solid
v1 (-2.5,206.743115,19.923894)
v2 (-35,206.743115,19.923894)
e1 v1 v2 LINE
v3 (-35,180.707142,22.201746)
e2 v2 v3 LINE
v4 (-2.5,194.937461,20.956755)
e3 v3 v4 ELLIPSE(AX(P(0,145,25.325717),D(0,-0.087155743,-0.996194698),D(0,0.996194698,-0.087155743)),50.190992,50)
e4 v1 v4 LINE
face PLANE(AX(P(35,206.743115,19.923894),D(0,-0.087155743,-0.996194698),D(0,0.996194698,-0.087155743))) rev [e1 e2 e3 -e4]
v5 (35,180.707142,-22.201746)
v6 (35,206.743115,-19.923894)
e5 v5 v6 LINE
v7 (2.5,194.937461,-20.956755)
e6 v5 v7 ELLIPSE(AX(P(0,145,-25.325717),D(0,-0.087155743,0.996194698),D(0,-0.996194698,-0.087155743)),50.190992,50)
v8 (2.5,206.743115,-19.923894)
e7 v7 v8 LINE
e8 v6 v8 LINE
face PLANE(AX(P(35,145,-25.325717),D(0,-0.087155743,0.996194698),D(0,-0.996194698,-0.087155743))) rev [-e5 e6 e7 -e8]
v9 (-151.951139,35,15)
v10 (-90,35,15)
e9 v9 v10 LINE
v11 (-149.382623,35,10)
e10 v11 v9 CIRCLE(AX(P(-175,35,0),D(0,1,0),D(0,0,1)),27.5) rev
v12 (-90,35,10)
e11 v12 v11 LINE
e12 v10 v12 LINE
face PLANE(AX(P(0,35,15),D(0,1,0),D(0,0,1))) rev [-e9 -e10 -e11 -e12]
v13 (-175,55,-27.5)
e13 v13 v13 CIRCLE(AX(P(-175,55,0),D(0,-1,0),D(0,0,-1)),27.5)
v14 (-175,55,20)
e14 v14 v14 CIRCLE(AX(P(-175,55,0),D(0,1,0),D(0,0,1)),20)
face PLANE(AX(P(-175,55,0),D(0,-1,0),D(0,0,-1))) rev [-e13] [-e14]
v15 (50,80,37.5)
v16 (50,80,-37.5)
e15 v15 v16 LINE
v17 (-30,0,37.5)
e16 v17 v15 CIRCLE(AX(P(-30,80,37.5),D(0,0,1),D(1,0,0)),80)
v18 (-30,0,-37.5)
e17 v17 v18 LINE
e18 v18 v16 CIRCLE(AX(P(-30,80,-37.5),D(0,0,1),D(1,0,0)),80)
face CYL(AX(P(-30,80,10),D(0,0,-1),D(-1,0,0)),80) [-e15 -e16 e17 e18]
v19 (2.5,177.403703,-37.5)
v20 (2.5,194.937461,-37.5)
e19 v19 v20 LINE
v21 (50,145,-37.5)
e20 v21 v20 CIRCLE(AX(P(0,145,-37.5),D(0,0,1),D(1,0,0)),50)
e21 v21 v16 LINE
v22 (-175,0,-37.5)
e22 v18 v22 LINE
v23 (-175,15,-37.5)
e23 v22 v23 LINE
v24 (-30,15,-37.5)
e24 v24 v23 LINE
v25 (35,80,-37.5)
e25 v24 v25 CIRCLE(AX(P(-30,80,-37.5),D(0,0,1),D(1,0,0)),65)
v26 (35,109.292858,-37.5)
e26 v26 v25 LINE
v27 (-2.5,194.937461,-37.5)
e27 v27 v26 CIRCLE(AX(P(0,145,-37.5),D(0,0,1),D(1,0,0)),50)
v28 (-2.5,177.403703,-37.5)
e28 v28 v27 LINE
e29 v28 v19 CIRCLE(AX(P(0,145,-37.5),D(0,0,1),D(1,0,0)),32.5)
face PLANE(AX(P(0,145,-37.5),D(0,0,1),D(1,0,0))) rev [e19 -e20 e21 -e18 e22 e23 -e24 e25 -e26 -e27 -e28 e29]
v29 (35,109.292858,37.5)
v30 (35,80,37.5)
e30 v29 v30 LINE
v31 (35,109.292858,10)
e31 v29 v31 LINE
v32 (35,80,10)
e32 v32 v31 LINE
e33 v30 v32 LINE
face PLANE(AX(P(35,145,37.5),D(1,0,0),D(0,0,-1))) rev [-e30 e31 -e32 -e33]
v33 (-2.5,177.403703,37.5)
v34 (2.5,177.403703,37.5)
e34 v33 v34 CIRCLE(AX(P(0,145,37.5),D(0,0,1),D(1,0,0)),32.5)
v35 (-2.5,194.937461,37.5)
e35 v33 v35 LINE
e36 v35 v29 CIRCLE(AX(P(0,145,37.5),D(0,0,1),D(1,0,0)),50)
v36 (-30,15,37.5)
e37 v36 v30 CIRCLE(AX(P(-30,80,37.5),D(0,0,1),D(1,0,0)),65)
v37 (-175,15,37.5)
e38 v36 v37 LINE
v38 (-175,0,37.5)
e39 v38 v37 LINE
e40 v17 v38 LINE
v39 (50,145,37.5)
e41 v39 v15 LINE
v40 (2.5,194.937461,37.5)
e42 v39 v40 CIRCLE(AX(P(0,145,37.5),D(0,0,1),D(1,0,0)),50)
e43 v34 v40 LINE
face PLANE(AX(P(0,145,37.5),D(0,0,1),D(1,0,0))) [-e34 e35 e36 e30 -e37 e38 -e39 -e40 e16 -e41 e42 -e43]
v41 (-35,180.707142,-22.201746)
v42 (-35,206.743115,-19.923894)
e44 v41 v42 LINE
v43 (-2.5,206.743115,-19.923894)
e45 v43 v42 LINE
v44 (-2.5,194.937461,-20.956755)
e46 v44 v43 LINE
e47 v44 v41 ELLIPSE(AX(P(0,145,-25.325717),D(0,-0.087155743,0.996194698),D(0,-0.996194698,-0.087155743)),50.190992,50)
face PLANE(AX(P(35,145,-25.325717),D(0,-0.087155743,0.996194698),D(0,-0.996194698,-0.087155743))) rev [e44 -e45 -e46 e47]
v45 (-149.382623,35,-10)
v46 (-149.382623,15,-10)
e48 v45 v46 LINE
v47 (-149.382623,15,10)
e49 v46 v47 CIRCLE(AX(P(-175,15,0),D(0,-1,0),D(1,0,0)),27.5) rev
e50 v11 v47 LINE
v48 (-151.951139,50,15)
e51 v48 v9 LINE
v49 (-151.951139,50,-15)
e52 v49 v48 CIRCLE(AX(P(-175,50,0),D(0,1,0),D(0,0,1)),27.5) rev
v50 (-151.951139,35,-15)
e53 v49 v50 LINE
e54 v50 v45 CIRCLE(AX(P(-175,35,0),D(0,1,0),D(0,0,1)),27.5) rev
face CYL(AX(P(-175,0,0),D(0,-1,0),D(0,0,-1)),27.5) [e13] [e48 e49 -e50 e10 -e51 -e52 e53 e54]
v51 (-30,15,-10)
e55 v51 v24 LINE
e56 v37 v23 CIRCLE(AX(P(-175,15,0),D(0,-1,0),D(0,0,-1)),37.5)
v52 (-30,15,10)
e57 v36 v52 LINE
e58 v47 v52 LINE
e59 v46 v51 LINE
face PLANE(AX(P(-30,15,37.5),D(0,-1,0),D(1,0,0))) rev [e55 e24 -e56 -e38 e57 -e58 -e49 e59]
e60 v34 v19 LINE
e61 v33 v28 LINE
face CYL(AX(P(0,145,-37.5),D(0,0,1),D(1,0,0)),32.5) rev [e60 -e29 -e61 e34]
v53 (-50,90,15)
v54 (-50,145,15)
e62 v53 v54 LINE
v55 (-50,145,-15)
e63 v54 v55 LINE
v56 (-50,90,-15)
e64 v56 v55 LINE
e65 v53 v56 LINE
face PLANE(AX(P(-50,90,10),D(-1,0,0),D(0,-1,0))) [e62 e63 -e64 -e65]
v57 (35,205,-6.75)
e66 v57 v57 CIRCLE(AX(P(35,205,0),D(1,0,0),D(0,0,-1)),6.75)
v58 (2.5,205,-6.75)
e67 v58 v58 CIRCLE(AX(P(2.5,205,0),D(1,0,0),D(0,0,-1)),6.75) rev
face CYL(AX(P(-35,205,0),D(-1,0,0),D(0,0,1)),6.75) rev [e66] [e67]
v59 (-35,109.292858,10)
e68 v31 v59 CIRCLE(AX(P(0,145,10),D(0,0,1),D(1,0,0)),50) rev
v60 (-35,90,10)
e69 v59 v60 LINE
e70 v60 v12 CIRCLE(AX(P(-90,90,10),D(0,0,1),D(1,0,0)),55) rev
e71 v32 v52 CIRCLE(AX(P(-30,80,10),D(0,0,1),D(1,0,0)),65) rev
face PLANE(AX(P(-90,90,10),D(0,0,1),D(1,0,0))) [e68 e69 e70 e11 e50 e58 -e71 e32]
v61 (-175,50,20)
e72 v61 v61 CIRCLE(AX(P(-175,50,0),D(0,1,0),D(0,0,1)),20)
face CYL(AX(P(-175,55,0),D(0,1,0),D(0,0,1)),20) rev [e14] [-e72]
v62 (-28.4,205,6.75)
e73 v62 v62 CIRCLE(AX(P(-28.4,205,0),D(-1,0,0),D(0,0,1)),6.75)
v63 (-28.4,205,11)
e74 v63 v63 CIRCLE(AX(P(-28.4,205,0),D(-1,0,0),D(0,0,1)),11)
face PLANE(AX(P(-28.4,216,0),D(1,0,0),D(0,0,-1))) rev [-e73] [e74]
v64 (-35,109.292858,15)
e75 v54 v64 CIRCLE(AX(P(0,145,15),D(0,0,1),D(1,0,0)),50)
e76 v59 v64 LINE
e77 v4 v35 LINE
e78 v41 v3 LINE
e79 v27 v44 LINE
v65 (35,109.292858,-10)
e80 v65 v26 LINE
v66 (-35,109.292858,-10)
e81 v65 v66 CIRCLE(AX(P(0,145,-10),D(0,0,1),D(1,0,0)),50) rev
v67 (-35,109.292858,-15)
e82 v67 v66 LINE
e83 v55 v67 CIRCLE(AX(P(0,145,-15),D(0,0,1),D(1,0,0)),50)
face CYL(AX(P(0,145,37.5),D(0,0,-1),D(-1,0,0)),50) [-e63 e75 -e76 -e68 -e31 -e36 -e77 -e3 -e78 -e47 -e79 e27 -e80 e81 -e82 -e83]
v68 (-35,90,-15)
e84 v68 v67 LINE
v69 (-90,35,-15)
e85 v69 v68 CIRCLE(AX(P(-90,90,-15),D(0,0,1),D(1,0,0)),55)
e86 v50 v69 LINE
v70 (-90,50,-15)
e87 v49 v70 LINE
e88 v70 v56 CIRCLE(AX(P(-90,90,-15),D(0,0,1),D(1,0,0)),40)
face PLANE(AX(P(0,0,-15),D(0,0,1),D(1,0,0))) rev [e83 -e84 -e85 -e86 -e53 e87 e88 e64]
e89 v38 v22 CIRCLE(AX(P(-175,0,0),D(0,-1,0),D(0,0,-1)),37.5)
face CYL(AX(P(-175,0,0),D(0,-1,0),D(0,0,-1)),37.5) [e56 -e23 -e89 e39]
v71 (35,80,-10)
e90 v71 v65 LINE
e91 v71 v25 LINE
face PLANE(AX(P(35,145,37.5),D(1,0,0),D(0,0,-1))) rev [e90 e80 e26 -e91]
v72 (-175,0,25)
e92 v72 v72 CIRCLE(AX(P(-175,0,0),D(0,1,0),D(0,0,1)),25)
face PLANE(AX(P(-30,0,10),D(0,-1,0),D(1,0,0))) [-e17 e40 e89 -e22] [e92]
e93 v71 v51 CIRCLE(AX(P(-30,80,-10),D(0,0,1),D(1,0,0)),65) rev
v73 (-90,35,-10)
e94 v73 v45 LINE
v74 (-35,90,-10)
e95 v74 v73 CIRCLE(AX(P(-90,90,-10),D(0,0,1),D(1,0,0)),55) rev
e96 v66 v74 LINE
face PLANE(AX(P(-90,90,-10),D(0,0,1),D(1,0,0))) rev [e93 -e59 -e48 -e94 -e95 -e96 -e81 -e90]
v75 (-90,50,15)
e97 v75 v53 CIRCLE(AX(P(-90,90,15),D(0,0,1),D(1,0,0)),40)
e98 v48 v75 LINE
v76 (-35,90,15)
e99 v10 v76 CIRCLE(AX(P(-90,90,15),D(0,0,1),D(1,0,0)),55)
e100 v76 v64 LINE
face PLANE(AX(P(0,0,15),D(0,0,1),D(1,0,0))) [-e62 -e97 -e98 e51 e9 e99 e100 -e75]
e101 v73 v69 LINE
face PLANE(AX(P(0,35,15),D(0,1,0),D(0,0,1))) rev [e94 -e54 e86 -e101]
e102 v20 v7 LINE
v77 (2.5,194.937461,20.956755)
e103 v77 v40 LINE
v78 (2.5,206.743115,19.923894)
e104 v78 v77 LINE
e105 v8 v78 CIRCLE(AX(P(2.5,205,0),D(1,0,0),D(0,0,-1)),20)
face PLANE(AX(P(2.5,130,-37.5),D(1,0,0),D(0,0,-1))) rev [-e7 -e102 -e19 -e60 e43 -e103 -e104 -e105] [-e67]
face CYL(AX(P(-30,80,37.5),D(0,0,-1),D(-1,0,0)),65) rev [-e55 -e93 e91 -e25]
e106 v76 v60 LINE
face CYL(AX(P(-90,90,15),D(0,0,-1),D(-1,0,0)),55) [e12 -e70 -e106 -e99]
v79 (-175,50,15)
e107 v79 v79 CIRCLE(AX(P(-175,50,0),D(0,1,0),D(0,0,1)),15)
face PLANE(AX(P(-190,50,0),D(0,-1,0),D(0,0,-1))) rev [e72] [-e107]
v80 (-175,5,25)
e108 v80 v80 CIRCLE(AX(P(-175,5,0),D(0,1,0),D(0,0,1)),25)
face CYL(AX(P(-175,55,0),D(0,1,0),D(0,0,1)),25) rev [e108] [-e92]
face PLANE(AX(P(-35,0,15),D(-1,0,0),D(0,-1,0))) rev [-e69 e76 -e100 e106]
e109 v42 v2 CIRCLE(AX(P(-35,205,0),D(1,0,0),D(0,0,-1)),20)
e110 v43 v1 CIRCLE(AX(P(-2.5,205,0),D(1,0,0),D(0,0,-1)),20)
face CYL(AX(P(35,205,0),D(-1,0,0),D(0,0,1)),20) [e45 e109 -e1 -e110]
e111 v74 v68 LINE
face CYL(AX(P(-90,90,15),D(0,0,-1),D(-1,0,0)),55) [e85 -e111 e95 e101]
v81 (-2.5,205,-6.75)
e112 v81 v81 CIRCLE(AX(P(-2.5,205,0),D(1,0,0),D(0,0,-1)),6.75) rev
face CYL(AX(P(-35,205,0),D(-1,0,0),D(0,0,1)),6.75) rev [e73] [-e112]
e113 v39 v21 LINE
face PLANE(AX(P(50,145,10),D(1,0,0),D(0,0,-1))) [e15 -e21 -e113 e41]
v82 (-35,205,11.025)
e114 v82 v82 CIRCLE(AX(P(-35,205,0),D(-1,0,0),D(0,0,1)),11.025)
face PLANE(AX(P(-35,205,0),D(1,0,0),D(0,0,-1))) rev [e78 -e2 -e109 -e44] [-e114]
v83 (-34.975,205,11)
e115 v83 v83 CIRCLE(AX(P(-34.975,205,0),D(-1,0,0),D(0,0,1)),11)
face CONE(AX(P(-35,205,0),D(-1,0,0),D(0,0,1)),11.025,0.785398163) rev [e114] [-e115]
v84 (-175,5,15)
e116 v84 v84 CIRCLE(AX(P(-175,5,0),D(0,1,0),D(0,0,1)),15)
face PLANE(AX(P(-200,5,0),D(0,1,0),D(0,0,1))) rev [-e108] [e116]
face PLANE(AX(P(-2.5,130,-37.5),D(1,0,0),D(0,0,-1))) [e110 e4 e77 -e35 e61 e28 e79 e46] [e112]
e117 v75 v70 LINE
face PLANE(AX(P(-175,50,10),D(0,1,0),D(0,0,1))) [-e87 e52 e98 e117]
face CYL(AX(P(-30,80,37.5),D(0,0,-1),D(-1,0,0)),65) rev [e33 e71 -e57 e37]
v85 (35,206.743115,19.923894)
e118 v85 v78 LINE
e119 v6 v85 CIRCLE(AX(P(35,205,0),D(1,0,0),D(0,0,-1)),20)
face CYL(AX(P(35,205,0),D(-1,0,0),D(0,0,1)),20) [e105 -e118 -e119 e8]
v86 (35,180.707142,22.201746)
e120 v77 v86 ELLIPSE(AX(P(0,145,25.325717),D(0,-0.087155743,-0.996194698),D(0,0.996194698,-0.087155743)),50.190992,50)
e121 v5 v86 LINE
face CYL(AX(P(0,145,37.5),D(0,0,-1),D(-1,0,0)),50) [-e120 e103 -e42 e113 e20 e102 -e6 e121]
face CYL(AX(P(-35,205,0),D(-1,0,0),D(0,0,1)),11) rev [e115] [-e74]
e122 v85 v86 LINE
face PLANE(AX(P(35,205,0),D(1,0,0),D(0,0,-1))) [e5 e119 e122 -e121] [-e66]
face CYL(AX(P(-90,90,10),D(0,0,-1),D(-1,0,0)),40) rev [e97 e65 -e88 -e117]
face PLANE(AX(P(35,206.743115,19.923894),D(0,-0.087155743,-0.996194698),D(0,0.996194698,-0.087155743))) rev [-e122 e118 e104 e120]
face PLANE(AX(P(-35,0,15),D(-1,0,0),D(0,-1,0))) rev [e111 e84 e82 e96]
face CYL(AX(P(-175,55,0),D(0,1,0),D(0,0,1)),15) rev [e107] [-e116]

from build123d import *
from build123d.topology import SkipClean

# Parameters (mm, degrees)
BOSS_EXTRUDE1_DEPTH     = 10
SKETCH1_3_R             = 50
BOSS_EXTRUDE2_DEPTH     = 37.5
BOSS_EXTRUDE3_DEPTH     = 15
BOSS_EXTRUDE4_DEPTH     = 37.5
BOSS_EXTRUDE5_DEPTH     = 35
CUT_EXTRUDE1_DEPTH      = 312.749097833
CUT_EXTRUDE1_DEPTH_BACK = 312.749097833
SKETCH12_R              = 32.5
SKETCH12_W              = 5
SKETCH12_H              = 95


with BuildPart() as part:
    # Sketch1 → Boss-Extrude1 (new, symmetric)
    with BuildSketch(Plane.XY):
        with BuildLine():
            Line((50, 145), (50, 80))
            ThreePointArc((50, 80), (26.568542495, 23.431457505), (-30, 0))
            Line((-30, 0), (-175, 0))
            Line((-175, 0), (-175, 50))
            Line((-175, 50), (-90, 50))
            ThreePointArc((-90, 50), (-61.715728753, 61.715728753), (-50, 90))
            Line((-50, 90), (-50, 145))
            Line((-50, 145), (50, 145))
        make_face()
    extrude(amount=BOSS_EXTRUDE1_DEPTH, both=True)

    # Sketch1<3> → Boss-Extrude2 (add, symmetric)
    with BuildSketch(Plane.XY):
        with Locations((0, 145)):
            Circle(SKETCH1_3_R)
    extrude(amount=BOSS_EXTRUDE2_DEPTH, both=True)

    # Sketch2 → Boss-Extrude3 (add, symmetric)
    with SkipClean():  # the faces are left unmerged after this step: merging them gives an invalid solid
        with BuildSketch(Plane.XY):
            with BuildLine():
                ThreePointArc((-90, 35), (-51.109127035, 51.109127035), (-35, 90))
                Line((-35, 90), (-35, 145))
                Line((-35, 145), (-50, 145))
                Line((-50, 145), (-50, 90))
                ThreePointArc((-50, 90), (-61.715728753, 61.715728753), (-90, 50))
                Line((-90, 50), (-175, 50))
                Line((-175, 50), (-175, 35))
                Line((-175, 35), (-90, 35))
            make_face()
        extrude(amount=BOSS_EXTRUDE3_DEPTH, both=True)
    add(part.part.scale(1), mode=Mode.REPLACE)  # the faces are merged on a copy

    # Sketch2<3> → Boss-Extrude4 (add, symmetric)
    with SkipClean():  # the faces are left unmerged after this step: merging them gives an invalid solid
        with BuildSketch(Plane.XY):
            with BuildLine():
                Line((-30, 15), (-175, 15))
                Line((-175, 15), (-175, 0))
                Line((-175, 0), (-30, 0))
                ThreePointArc((-30, 0), (26.568542495, 23.431457505), (50, 80))
                Line((50, 80), (50, 145))
                Line((50, 145), (35, 145))
                Line((35, 145), (35, 80))
                ThreePointArc((35, 80), (15.961940777, 34.038059223), (-30, 15))
            make_face()
        extrude(amount=BOSS_EXTRUDE4_DEPTH, both=True)
    add(part.part.scale(1), mode=Mode.REPLACE)  # the faces are merged on a copy

    # Sketch4 → Revolve1 (revolve)
    with BuildSketch(Plane.XY):
        Polygon((-175, 55), (-202.5, 55), (-202.5, 15), (-212.5, 15), (-212.5, 0), (-175, 0), align=None)
    revolve(axis=Axis((-175, 0, 0), (0, 1, 0)))

    # Sketch6 → Boss-Extrude5 (add, symmetric)
    with BuildSketch(Plane(origin=(0, 0, 0), x_dir=(0, 0, -1), z_dir=(1, 0, 0))):
        with BuildLine():
            Line((-25.325716562, 145), (25.325716562, 145))
            Line((25.325716562, 145), (19.923893962, 206.743114855))
            ThreePointArc((19.923893962, 206.743114855), (0, 225), (-19.923893962, 206.743114855))
            Line((-19.923893962, 206.743114855), (-25.325716562, 145))
        make_face()
    extrude(amount=BOSS_EXTRUDE5_DEPTH, both=True)

    # Sketch11 → CBORE for M12 SBHCS1 (revolve, cut)
    with BuildSketch(Plane(origin=(-35, 205, 0), x_dir=(0, 0, 1), z_dir=(0, 1, 0))):
        Polygon((0, 0), (0, 85), (6.75, 85), (6.75, 6.6), (11, 6.6), (11, 0.025), (11.025, 0), align=None)
    revolve(axis=Axis((-41.35, 205, 0), (1, 0, 0)), mode=Mode.SUBTRACT)

    # Sketch12 → Cut-Extrude1 (cut, two sides: drawn at the far end of the back side and taken through both)
    with BuildSketch(Plane.XY.offset(-CUT_EXTRUDE1_DEPTH_BACK)):
        with Locations((0, 145)):
            Circle(SKETCH12_R)
        with Locations((0, 177.5)):
            Rectangle(SKETCH12_W, SKETCH12_H)
    extrude(amount=CUT_EXTRUDE1_DEPTH + CUT_EXTRUDE1_DEPTH_BACK, mode=Mode.SUBTRACT)

    # Sketch13 → Cut-Revolve1 (revolve, cut)
    with BuildSketch(Plane.XY):
        Polygon((-175, 0), (-200, 0), (-200, 5), (-190, 5), (-190, 50), (-195, 50), (-195, 55), (-175, 55), align=None)
    revolve(axis=Axis((-175, 55, 0), (0, -1, 0)), mode=Mode.SUBTRACT)


solid = part.part
